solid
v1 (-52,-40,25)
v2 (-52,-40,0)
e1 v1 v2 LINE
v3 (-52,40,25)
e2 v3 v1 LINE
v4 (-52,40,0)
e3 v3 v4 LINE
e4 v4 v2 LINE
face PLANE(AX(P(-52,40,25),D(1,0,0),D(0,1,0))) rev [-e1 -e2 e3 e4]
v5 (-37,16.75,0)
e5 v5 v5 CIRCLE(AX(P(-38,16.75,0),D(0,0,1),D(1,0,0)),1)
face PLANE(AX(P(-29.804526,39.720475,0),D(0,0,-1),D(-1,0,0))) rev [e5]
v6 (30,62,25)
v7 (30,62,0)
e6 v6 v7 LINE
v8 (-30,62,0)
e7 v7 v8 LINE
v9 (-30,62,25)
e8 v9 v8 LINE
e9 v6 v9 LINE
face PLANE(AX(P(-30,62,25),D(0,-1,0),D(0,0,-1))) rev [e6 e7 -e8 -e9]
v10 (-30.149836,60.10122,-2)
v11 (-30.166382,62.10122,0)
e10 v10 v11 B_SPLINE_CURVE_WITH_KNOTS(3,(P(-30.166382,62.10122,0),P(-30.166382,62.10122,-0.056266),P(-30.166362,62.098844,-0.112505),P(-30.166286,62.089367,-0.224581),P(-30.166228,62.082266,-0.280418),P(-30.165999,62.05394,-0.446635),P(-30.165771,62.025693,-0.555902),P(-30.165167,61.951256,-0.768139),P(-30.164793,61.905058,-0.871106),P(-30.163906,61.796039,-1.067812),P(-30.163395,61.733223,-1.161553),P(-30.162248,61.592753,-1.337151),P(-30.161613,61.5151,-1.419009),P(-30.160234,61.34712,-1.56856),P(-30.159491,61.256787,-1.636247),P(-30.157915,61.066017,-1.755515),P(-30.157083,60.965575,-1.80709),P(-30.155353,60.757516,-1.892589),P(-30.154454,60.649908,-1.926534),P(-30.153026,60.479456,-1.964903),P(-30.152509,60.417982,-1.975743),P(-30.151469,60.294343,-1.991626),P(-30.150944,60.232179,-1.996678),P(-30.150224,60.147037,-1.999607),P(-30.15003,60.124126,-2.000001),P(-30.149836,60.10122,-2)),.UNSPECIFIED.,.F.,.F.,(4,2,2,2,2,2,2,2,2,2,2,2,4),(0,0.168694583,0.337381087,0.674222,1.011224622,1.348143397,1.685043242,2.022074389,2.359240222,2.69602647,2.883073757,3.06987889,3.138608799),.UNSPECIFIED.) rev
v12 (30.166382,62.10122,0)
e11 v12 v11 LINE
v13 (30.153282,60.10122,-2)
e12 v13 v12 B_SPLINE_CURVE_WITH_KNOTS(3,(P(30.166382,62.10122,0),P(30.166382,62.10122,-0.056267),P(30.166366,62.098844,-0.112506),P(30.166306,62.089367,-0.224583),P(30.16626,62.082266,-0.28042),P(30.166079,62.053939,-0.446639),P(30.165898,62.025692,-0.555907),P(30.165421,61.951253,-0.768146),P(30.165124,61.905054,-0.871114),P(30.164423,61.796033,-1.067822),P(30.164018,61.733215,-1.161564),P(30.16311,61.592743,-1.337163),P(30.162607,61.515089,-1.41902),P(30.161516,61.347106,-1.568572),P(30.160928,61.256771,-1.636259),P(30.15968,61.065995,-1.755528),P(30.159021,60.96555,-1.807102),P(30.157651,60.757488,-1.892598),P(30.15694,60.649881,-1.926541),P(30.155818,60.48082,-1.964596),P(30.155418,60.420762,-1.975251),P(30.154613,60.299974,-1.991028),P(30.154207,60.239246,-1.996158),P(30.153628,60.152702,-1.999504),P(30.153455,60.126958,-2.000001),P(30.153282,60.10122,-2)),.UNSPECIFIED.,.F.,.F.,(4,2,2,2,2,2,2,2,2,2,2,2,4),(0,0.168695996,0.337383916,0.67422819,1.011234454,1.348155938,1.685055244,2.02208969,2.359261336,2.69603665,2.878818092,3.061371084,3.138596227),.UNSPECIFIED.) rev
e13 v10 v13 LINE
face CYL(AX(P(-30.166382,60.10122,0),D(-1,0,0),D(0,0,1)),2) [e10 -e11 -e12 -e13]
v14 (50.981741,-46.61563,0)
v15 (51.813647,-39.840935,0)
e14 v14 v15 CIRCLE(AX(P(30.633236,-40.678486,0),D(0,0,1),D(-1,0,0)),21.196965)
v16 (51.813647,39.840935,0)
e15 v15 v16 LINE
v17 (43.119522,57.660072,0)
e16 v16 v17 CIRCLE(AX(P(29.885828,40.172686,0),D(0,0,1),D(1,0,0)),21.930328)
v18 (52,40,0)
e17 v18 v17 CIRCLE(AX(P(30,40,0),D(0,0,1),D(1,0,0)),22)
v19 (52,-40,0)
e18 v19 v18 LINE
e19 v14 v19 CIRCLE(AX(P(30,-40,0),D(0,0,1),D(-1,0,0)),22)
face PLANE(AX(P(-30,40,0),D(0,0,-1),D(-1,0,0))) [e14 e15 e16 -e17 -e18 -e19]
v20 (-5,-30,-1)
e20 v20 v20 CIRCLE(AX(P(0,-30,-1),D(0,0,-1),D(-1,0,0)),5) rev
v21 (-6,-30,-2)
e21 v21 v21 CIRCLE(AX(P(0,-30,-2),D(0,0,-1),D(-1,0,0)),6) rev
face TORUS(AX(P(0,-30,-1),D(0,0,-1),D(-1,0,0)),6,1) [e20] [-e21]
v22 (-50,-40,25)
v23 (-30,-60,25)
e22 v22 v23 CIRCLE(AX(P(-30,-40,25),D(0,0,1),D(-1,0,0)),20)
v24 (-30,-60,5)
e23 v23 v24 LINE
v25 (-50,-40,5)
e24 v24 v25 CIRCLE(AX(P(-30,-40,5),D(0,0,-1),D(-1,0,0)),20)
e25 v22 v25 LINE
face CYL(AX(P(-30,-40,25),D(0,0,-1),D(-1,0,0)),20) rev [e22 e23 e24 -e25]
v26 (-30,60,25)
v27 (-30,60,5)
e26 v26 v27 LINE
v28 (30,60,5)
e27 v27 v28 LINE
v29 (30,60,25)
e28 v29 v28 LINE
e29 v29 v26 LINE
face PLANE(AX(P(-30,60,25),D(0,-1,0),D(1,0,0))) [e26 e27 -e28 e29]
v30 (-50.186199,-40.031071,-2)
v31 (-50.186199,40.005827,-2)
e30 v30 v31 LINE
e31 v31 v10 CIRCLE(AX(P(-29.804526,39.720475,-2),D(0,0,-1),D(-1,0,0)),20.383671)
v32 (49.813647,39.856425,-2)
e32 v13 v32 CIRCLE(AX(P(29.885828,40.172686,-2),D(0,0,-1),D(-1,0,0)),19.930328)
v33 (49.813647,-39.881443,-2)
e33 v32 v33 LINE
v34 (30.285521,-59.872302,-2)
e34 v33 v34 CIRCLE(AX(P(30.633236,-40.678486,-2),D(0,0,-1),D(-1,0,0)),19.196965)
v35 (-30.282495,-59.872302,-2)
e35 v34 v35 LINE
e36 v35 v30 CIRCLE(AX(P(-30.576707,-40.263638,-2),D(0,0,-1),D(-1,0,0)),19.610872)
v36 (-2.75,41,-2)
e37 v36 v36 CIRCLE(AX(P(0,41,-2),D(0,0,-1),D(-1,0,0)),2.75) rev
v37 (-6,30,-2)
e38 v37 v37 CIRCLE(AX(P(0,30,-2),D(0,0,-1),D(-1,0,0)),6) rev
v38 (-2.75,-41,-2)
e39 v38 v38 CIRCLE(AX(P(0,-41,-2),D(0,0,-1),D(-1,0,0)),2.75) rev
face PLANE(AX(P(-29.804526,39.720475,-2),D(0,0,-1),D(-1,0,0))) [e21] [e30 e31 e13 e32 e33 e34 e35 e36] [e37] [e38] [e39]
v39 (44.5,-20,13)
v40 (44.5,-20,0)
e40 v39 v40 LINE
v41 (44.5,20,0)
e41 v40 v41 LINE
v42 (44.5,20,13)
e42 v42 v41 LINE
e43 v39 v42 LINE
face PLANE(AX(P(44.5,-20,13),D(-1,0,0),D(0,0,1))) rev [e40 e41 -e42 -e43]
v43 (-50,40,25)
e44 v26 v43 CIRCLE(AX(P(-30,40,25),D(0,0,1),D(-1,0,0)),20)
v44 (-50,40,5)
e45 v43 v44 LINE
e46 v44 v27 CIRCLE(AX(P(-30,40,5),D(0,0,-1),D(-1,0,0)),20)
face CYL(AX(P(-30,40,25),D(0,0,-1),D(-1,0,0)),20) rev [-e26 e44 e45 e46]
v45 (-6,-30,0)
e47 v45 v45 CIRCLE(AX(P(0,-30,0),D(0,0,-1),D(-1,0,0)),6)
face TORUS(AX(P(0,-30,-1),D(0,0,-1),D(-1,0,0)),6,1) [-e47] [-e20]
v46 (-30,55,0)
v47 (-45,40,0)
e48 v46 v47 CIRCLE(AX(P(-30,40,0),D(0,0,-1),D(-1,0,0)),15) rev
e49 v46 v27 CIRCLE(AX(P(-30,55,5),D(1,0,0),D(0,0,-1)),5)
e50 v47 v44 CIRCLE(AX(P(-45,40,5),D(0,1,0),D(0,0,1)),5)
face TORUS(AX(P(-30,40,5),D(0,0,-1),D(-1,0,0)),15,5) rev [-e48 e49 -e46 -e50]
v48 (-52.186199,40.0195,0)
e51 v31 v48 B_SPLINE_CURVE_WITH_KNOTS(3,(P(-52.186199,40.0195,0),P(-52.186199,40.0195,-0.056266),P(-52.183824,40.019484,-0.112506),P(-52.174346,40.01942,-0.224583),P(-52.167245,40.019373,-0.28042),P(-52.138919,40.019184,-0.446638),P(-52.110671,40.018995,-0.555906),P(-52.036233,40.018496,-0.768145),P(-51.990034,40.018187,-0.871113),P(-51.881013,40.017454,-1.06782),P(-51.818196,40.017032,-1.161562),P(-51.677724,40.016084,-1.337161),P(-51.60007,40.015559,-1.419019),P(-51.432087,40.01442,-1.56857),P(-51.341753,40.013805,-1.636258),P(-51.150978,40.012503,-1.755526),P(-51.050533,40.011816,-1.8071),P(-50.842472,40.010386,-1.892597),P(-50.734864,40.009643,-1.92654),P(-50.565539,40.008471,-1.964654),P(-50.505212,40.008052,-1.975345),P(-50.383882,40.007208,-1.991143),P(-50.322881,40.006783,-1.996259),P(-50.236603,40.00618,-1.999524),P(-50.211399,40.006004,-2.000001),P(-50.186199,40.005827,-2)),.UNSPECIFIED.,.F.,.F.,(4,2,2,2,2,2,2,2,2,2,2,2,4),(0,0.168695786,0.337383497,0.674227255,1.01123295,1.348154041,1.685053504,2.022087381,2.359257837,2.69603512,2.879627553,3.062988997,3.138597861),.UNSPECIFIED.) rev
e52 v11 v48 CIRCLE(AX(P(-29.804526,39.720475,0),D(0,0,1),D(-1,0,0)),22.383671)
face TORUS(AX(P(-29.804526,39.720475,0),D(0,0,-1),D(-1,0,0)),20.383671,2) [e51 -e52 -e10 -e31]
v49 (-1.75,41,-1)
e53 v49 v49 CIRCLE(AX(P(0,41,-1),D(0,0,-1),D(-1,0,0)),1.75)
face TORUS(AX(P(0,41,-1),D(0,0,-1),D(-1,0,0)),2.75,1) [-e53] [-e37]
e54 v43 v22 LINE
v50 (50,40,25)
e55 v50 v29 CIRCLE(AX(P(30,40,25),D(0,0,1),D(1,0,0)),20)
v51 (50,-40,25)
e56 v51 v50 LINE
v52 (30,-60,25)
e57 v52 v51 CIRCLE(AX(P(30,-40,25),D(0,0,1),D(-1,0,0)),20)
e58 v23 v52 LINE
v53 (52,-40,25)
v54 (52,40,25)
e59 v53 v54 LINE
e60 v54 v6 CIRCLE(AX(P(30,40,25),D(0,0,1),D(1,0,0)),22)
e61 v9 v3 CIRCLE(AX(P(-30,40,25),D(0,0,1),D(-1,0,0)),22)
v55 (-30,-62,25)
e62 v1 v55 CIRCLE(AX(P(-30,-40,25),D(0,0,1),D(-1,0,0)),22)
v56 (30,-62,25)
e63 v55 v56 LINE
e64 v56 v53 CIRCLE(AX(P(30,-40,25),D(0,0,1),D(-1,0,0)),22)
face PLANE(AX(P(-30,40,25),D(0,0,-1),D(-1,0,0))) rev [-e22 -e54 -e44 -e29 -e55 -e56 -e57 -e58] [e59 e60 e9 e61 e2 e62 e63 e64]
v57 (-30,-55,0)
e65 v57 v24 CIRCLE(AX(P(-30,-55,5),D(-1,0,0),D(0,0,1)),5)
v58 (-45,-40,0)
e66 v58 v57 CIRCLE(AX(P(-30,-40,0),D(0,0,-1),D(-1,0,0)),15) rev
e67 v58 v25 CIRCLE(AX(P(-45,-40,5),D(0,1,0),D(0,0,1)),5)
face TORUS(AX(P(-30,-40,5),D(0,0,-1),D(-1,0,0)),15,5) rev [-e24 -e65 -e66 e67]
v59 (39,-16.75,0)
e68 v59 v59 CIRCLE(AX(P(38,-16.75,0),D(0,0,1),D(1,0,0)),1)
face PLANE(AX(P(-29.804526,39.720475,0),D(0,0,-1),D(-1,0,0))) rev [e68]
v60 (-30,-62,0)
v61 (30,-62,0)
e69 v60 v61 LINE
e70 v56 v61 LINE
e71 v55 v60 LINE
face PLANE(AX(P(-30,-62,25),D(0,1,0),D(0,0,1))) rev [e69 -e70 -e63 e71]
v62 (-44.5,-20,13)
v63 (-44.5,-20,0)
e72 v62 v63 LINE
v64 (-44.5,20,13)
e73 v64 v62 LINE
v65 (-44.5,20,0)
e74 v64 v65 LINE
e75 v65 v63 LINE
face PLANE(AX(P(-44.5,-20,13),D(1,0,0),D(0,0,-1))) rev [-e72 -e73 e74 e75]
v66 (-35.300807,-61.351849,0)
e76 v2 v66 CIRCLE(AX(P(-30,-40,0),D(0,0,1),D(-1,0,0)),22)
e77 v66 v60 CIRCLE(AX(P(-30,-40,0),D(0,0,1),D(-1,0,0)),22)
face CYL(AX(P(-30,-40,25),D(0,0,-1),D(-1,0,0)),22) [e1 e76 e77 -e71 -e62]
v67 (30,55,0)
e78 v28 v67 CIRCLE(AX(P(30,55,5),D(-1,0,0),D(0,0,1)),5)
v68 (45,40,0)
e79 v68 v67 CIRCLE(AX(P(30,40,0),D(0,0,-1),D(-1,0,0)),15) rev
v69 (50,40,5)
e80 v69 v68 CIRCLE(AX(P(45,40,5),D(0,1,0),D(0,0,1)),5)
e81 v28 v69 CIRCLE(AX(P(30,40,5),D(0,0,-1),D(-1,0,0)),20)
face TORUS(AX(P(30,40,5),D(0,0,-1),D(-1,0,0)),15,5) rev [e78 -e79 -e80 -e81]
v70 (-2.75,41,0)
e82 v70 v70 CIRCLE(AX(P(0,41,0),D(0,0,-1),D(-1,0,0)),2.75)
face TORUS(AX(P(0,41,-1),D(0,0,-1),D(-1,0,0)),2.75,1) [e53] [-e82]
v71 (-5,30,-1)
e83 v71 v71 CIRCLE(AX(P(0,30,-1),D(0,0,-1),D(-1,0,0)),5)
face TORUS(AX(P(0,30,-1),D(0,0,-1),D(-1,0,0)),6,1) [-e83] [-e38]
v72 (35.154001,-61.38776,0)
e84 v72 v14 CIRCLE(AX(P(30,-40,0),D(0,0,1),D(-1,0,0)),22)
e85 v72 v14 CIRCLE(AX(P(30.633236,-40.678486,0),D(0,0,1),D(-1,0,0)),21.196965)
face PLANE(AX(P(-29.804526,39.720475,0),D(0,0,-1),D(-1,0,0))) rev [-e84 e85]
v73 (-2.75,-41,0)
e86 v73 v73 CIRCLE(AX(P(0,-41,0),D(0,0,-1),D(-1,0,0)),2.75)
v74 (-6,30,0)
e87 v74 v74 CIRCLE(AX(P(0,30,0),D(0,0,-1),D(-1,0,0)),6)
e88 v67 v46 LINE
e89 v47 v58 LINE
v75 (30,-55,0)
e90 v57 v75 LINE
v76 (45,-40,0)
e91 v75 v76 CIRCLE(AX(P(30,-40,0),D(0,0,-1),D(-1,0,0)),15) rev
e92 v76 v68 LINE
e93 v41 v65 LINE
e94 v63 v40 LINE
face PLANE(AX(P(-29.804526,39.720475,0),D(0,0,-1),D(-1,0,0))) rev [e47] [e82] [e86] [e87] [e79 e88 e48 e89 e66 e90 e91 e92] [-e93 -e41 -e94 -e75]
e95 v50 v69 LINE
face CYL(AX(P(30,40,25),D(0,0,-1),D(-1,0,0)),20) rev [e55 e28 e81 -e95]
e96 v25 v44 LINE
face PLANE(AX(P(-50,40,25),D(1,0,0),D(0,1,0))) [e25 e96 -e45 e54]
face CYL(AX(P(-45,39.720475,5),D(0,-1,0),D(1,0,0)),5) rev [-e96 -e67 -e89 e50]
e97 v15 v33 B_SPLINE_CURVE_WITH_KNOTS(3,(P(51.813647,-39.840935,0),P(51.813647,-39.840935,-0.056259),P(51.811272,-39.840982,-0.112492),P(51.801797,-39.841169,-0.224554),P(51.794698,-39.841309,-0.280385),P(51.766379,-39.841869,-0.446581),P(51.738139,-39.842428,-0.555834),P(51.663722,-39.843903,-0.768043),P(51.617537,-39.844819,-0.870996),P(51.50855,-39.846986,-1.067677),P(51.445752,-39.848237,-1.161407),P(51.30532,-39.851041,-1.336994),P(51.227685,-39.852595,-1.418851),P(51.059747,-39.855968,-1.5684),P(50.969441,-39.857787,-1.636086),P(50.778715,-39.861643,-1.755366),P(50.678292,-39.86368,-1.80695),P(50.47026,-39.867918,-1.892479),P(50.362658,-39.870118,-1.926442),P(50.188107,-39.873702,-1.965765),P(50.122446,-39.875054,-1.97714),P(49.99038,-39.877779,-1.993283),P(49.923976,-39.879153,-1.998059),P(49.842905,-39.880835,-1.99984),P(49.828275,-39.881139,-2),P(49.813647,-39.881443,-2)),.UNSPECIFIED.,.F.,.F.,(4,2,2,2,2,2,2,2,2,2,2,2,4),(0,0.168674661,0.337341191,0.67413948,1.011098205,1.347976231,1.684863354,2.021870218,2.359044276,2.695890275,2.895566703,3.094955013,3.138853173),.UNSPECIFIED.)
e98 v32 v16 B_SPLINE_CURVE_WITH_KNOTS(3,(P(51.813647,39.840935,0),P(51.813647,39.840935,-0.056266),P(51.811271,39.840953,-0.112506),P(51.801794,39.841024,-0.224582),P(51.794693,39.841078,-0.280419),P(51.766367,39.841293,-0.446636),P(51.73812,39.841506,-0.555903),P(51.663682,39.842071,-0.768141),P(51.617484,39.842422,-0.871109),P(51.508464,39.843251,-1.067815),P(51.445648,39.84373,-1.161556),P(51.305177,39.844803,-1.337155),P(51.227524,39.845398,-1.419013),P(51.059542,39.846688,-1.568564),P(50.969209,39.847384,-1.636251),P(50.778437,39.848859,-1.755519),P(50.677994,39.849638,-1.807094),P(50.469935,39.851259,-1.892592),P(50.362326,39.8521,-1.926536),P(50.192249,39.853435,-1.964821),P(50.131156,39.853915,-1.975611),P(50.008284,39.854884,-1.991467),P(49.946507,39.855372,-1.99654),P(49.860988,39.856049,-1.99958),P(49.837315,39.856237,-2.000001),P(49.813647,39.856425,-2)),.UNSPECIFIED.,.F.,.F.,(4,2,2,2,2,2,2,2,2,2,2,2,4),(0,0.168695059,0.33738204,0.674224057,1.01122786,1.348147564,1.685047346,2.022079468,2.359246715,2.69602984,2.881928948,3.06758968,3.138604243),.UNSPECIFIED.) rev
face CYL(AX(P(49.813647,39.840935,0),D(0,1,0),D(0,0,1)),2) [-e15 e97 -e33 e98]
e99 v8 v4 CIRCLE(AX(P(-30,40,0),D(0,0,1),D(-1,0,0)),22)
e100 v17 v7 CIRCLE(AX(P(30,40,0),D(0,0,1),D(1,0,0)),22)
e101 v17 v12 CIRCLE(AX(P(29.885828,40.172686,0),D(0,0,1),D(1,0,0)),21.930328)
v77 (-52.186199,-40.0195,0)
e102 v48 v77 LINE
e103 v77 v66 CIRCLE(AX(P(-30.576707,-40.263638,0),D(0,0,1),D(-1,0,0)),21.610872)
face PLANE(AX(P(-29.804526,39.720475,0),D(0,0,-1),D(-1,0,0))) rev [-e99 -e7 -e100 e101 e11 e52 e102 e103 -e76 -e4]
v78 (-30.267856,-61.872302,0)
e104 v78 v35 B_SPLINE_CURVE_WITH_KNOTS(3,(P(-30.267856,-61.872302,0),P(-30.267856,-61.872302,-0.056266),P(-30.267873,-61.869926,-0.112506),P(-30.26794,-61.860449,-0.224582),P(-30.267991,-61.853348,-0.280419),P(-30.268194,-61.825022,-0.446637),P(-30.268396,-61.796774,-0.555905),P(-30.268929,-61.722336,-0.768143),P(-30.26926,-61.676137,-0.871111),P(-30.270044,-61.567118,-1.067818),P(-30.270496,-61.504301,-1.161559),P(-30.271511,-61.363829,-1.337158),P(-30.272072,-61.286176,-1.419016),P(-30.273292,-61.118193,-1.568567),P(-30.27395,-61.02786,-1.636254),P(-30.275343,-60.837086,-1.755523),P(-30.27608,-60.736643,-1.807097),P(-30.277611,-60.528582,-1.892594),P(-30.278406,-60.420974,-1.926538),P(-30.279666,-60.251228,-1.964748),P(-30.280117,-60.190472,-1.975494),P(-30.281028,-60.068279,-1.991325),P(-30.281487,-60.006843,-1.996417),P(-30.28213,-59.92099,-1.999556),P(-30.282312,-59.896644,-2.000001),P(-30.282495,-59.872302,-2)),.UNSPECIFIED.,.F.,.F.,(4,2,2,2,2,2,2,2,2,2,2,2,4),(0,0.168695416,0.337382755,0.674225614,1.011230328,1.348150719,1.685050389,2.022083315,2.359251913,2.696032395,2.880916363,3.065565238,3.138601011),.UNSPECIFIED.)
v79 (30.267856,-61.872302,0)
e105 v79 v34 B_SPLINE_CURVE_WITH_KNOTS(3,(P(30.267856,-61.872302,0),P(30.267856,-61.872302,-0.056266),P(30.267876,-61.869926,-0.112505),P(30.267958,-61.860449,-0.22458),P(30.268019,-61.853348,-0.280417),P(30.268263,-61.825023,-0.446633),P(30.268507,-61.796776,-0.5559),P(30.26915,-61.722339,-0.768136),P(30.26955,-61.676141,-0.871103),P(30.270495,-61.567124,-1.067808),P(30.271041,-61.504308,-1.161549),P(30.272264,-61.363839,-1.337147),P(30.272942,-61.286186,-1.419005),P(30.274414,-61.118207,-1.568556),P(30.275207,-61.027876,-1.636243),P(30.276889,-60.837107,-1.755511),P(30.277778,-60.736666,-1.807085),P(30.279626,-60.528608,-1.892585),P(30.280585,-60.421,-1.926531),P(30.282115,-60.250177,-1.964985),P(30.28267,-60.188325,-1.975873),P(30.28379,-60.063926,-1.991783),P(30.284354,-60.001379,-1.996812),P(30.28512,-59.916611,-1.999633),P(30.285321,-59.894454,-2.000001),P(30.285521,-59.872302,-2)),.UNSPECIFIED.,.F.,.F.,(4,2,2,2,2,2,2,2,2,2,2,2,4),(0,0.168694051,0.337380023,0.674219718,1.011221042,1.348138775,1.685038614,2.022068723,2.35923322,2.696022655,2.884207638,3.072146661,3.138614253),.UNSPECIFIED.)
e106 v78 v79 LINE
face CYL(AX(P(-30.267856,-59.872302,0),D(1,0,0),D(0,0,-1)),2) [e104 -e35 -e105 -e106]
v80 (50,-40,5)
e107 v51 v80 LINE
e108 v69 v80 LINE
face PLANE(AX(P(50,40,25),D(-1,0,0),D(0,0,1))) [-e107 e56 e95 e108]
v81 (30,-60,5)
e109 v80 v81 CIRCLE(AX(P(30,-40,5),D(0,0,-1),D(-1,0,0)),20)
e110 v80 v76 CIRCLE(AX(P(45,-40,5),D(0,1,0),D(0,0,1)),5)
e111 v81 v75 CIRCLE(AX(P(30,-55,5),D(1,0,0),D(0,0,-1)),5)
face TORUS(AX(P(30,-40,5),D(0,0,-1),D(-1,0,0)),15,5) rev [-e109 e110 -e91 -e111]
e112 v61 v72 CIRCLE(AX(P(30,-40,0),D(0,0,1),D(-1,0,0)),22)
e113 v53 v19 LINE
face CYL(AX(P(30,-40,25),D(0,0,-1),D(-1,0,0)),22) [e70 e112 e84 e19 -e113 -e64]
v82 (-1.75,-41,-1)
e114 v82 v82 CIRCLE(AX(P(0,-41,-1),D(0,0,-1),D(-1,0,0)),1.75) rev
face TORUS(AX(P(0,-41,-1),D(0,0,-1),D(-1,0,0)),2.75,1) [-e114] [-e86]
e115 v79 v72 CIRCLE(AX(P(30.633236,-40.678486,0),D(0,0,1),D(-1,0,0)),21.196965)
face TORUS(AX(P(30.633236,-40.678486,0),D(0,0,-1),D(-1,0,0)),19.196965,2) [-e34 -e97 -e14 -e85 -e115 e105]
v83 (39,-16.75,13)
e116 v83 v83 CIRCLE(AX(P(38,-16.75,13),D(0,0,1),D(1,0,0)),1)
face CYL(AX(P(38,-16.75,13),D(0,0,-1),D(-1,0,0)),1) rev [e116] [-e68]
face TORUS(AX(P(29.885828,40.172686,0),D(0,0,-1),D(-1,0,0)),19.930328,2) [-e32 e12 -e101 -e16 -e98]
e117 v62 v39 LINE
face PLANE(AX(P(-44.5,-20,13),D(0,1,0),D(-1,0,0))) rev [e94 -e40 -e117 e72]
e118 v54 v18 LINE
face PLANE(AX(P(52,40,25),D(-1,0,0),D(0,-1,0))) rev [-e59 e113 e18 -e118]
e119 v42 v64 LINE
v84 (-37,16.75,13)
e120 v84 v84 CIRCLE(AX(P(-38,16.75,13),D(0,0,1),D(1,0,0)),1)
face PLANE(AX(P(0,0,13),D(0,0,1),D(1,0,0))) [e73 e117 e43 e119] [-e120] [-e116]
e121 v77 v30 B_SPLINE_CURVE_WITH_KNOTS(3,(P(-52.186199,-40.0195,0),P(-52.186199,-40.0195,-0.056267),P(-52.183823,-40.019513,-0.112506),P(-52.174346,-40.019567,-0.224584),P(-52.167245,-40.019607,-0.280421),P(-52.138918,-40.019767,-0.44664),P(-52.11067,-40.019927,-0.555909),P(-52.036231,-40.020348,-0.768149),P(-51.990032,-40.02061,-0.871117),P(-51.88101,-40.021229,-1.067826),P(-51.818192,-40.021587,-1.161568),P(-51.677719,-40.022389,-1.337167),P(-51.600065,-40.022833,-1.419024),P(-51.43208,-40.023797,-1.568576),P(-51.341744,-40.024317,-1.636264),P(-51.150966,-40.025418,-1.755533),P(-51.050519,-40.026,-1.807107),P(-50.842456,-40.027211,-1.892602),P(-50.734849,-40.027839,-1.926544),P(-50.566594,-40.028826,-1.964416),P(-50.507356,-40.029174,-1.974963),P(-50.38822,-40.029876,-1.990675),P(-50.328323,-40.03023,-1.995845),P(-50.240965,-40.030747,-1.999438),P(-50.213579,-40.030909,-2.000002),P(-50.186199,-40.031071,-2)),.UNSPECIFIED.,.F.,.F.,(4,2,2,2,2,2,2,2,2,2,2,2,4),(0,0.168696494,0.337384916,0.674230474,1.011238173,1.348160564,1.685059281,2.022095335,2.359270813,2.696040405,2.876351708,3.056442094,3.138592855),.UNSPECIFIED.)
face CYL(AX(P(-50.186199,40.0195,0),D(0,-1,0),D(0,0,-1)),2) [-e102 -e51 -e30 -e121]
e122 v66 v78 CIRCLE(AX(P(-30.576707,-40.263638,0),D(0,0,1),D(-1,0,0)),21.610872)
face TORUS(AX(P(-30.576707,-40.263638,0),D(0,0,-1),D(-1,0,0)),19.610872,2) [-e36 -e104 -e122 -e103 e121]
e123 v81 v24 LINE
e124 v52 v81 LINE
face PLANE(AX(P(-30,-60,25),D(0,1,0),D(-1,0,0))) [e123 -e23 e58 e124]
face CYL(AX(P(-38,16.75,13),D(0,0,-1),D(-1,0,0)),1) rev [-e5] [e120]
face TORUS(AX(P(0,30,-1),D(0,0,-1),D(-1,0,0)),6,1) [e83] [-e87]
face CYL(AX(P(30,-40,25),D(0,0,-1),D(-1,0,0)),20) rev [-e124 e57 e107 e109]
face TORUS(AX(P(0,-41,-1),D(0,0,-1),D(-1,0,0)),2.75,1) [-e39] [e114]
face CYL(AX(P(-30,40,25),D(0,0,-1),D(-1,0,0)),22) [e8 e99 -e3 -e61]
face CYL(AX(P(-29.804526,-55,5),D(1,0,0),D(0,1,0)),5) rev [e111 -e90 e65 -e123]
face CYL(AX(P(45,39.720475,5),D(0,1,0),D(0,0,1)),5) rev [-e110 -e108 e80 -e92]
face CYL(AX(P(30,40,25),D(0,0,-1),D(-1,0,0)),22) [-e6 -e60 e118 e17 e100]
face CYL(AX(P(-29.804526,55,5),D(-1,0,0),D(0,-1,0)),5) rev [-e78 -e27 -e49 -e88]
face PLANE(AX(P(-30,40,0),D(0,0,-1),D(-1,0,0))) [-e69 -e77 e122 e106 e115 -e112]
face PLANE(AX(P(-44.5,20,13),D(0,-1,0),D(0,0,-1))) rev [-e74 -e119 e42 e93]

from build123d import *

# Parameters (mm, degrees)
BOSS_EXTRUDE7_DEPTH  = 25
CASE_BOTTOM_R        = 1.75
CASE_BOTTOM_R_2      = 5
BOSS_EXTRUDE9_DEPTH  = 2
FILLET1_R            = 5
FILLET2_R            = 2
FILLET3_R            = 1
SONOFF_W             = 89
SONOFF_H             = 40
SONOFF_R             = 1
BOSS_EXTRUDE10_DEPTH = 13


# Some blends are built 0.0001 mm under size
with BuildPart() as part:
    # Case Sides → Boss-Extrude7 (new body)
    with BuildSketch(Plane.XY):
        with BuildLine():
            Line((-30, 62), (30, 62))
            ThreePointArc((30, 62), (45.556349186, 55.556349186), (52, 40))
            Line((52, 40), (52, -40))
            ThreePointArc((52, -40), (45.556349186, -55.556349186), (30, -62))
            Line((30, -62), (-30, -62))
            ThreePointArc((-30, -62), (-45.556349186, -55.556349186), (-52, -40))
            Line((-52, -40), (-52, 40))
            ThreePointArc((-52, 40), (-45.556349186, 55.556349186), (-30, 62))
        make_face()
        with BuildLine():
            Line((-30, 60), (30, 60))
            ThreePointArc((30, 60), (44.142135624, 54.142135624), (50, 40))
            Line((50, 40), (50, -40))
            ThreePointArc((50, -40), (44.142135624, -54.142135624), (30, -60))
            Line((30, -60), (-30, -60))
            ThreePointArc((-30, -60), (-44.142135624, -54.142135624), (-50, -40))
            Line((-50, -40), (-50, 40))
            ThreePointArc((-50, 40), (-44.142135624, 54.142135624), (-30, 60))
        make_face(mode=Mode.SUBTRACT)
    extrude(amount=BOSS_EXTRUDE7_DEPTH)

    # Case Bottom → Boss-Extrude9 (add)
    with BuildSketch(Plane.XY):
        with BuildLine():
            Line((-30.166381545, 62.101220113), (30.166381545, 62.101220113))
            ThreePointArc((30.166381545, 62.101220113), (45.607883681, 55.461776572), (51.813647258, 39.840934815))
            Line((51.813647258, 39.840934815), (51.813647258, -39.840934815))
            ThreePointArc((51.813647258, -39.840934815), (45.787828122, -55.499068587), (30.267855704, -61.872302115))
            Line((30.267855704, -61.872302115), (-30.267855704, -61.872302115))
            ThreePointArc((-30.267855704, -61.872302115), (-45.835002173, -55.567695757), (-52.186199447, -40.019499601))
            Line((-52.186199447, -40.019499601), (-52.186199447, 40.019499601))
            ThreePointArc((-52.186199447, 40.019499601), (-45.654372223, 55.52588799), (-30.166381545, 62.101220113))
        make_face()
        with Locations((0, 41)):
            Circle(CASE_BOTTOM_R, mode=Mode.SUBTRACT)
        with Locations((0, -41)):
            Circle(CASE_BOTTOM_R, mode=Mode.SUBTRACT)
        with Locations((0, 30)):
            Circle(CASE_BOTTOM_R_2, mode=Mode.SUBTRACT)
        with Locations((0, -30)):
            Circle(CASE_BOTTOM_R_2, mode=Mode.SUBTRACT)
    extrude(amount=-BOSS_EXTRUDE9_DEPTH)

    # Fillet1
    fillet1_edges = [part.edges().sort_by_distance(p)[0] for p in [
        (44.142135624, 54.142135624, 0),
        (0, 60, 0),
        (-44.142135624, 54.142135624, 0),
        (-50, 0, 0),
        (-44.142135624, -54.142135624, 0),
        (0, -60, 0),
        (44.142135624, -54.142135624, 0),
        (50, 0, 0),
    ]]
    fillet(fillet1_edges, radius=FILLET1_R)

    # Fillet2
    # the kernel refuses this fillet: 2 mm, written as the material it adds along each edge
    with BuildSketch(Plane(origin=(51.813647258, 39.840934815, 0.036995851), x_dir=(0.014804575706989804, 0.9998904062636744, 0), z_dir=(0, 0, -1))) as fillet2_piece_1:
        with BuildLine():
            CenterArc((0.014812433, 1.999999896), FILLET2_R, 269.151729306, 0.829764856)
            Line((-0.014796719, 0.000219083), (0, 0))
            ThreePointArc((0, 0), (0.007083229, 1.144e-06), (0.014166457, 0))
        make_face()
    extrude(amount=2.036995851)
    with BuildSketch(Plane(origin=(51.813647258, -39.840934815, 0.096592655), x_dir=(0, 1, 0), z_dir=(0, 0, -1))) as fillet2_piece_2:
        with BuildLine():
            CenterArc((0.038637062, 2), FILLET2_R, 267.835326297, 2.164673703)
            ThreePointArc((-0.03690633, 0.00142721), (-0.018452854, 0.000721643), (0, 0))
            Line((0, 0), (0.038637062, 0))
        make_face()
    extrude(amount=2.096592655)
    with BuildSketch(Plane(origin=(30.267855704, -61.872302115, 0.042125301), x_dir=(0.9998579024887219, -0.016857485899548712, 0), z_dir=(0, 0, -1))) as fillet2_piece_3:
        with BuildLine():
            CenterArc((0.016867246, 1.999999856), FILLET2_R, 269.034091453, 0.944139309)
            Line((-0.016847726, 0.000284051), (0, 0))
            ThreePointArc((0, 0), (0.008053678, 1.53e-06), (0.016107356, 0))
        make_face()
    extrude(amount=2.042125301)
    with BuildSketch(Plane(origin=(-30.267855704, -61.872302115, 0.034939961), x_dir=(-0.9999022450245147, -0.013982145576956704, 0), z_dir=(0, 0, -1))) as fillet2_piece_4:
        with BuildLine():
            CenterArc((0.013989673, -1.999999904), FILLET2_R, 90.017724864, 0.783419172)
            Line((-0.013974618, -0.000195414), (0, 0))
            ThreePointArc((0, 0), (0.006685479, -1.034e-06), (0.013370958, 0))
        make_face()
    extrude(amount=2.034939961)
    with BuildSketch(Plane(origin=(-52.186199447, -40.019499601, 0), x_dir=(0, 1, 0), z_dir=(0, 0, -1))) as fillet2_piece_5:
        with BuildLine():
            CenterArc((0.011047407, -2), FILLET2_R, 90, 0.619262575)
            ThreePointArc((-0.010568514, -0.000116815), (-0.00528425, -5.9054e-05), (0, 0))
            Line((0, 0), (0.011047407, 0))
        make_face()
    extrude(amount=2)
    # the kernel refuses this fillet: 2 mm, written as the material it takes off along each edge
    with BuildSketch(Plane(origin=(-52.186199447, 40.019499601, 0.035818212), x_dir=(0, -1, 0), z_dir=(0, 0, -1))) as fillet2_2_piece_1:
        with BuildLine():
            CenterArc((0.013672232, -2), FILLET2_R, 90, 0.802114876)
            ThreePointArc((-0.014325944, -0.000195984), (-0.007162988, -9.6846e-05), (0, 0))
            Line((0, 0), (0.013672232, 0))
        make_face()
    extrude(amount=2.071636423, mode=Mode.SUBTRACT)
    with BuildSketch(Plane(origin=(-30.166381545, 62.101220113, 0.043345147), x_dir=(1, 0, 0), z_dir=(0, 0, -1))) as fillet2_2_piece_2:
        with BuildLine():
            CenterArc((0.016545352, 2), FILLET2_R, 269.029333404, 0.970666596)
            ThreePointArc((-0.017335683, 0.000287002), (-0.008667869, 0.000141822), (0, 0))
            Line((0, 0), (0.016545352, 0))
        make_face()
    extrude(amount=2.086690294, mode=Mode.SUBTRACT)
    with BuildSketch(Plane(origin=(30.166381545, 62.101220113, 0.034352007), x_dir=(0.9999141102581969, -0.013106185812745422, 0), z_dir=(0, 0, -1))) as fillet2_2_piece_3:
        with BuildLine():
            CenterArc((0.013114237, 1.999999902), FILLET2_R, 269.249049368, 0.768900433)
            Line((-0.013098135, 0.000171681), (0, 0))
            ThreePointArc((0, 0), (0.006870401, -1.076e-06), (0.013740803, 0))
        make_face()
    extrude(amount=2.068704014, mode=Mode.SUBTRACT)
    # the kernel refuses this fillet: 2 mm, written as the material it takes off along each edge
    with BuildSketch(Plane(origin=(-29.804526261, 39.720474564, -2), x_dir=(-0.9999020079624725, 0.013999088278010021, 0), z_dir=(-0.013999088278010021, -0.9999020079624725, 0))) as fillet2_3_piece_1:
        with BuildLine():
            CenterArc((22.383670624 - FILLET2_R, -FILLET2_R), FILLET2_R, 0, 90)
            Line((22.383670624, -FILLET2_R), (22.383670624, 0))
            Line((22.383670624, 0), (22.383670624 - FILLET2_R, 0))
        make_face()
    revolve(axis=Axis((-29.804526261, 39.720474564, -2), (0, 0, -1)), revolution_arc=88.227218528, mode=Mode.SUBTRACT)
    with BuildSketch(Plane(origin=(-30.149836193, 62.101220113, -2), x_dir=(0, -1, 0), z_dir=(1, 0, 0))) as fillet2_3_piece_2:
        with BuildLine():
            CenterArc((FILLET2_R, -FILLET2_R), FILLET2_R, 90, 90)
            Line((0, -FILLET2_R), (0, 0))
            Line((0, 0), (FILLET2_R, 0))
        make_face()
    extrude(amount=60.303118478, mode=Mode.SUBTRACT)
    with BuildSketch(Plane(origin=(29.885828413, 40.172686456, -2), x_dir=(0.013419441370281596, 0.9999099552426256, 0), z_dir=(-0.9999099552426256, 0.013419441370281596, 0))) as fillet2_3_piece_3:
        with BuildLine():
            CenterArc((21.930328279 - FILLET2_R, -FILLET2_R), FILLET2_R, 0, 90)
            Line((21.930328279, -FILLET2_R), (21.930328279, 0))
            Line((21.930328279, 0), (21.930328279 - FILLET2_R, 0))
        make_face()
    revolve(axis=Axis((29.885828413, 40.172686456, -2), (0, 0, -1)), revolution_arc=90.060864423, mode=Mode.SUBTRACT)
    with BuildSketch(Plane(origin=(51.813647258, 39.826136474, -2), x_dir=(-1, 0, 0), z_dir=(0, -1, 0))) as fillet2_3_piece_4:
        with BuildLine():
            CenterArc((FILLET2_R, -FILLET2_R), FILLET2_R, 90, 90)
            Line((0, -FILLET2_R), (0, 0))
            Line((0, 0), (FILLET2_R, 0))
        make_face()
    extrude(amount=79.628434227, mode=Mode.SUBTRACT)
    with BuildSketch(Plane(origin=(30.63323575, -40.678486464, -2), x_dir=(0.999286394870838, 0.03777169609699212, 0), z_dir=(-0.03777169609699212, 0.999286394870838, 0))) as fillet2_3_piece_5:
        with BuildLine():
            CenterArc((21.196964981 - FILLET2_R, -FILLET2_R), FILLET2_R, 0, 90)
            Line((21.196964981, -FILLET2_R), (21.196964981, 0))
            Line((21.196964981, 0), (21.196964981 - FILLET2_R, 0))
        make_face()
    revolve(axis=Axis((30.63323575, -40.678486464, -2), (0, 0, -1)), revolution_arc=93.108813012, mode=Mode.SUBTRACT)
    with BuildSketch(Plane(origin=(30.251005584, -61.872302115, -2), x_dir=(0, 1, 0), z_dir=(-1, 0, 0))) as fillet2_3_piece_6:
        with BuildLine():
            CenterArc((FILLET2_R, -FILLET2_R), FILLET2_R, 90, 90)
            Line((0, -FILLET2_R), (0, 0))
            Line((0, 0), (FILLET2_R, 0))
        make_face()
    extrude(amount=60.504885303, mode=Mode.SUBTRACT)
    with BuildSketch(Plane(origin=(-30.576706868, -40.263637561, -2), x_dir=(0.013672817925882458, -0.9999065226559758, 0), z_dir=(0.9999065226559758, 0.013672817925882458, 0))) as fillet2_3_piece_7:
        with BuildLine():
            CenterArc((21.610871636 - FILLET2_R, -FILLET2_R), FILLET2_R, 0, 90)
            Line((21.610871636, -FILLET2_R), (21.610871636, 0))
            Line((21.610871636, 0), (21.610871636 - FILLET2_R, 0))
        make_face()
    revolve(axis=Axis((-30.576706868, -40.263637561, -2), (0, 0, -1)), revolution_arc=91.402681747, mode=Mode.SUBTRACT)
    with BuildSketch(Plane(origin=(-52.186199447, -40.008452194, -2), x_dir=(1, 0, 0), z_dir=(0, 1, 0))) as fillet2_3_piece_8:
        with BuildLine():
            CenterArc((FILLET2_R, -FILLET2_R), FILLET2_R, 90, 90)
            Line((0, -FILLET2_R), (0, 0))
            Line((0, 0), (FILLET2_R, 0))
        make_face()
    extrude(amount=80.014279563, mode=Mode.SUBTRACT)
    with BuildSketch(Plane(origin=(-54.186199447, -40.008452194, -2), x_dir=(1, 0, 0), z_dir=(0, 1, 0))) as fillet2_3_piece_9:
        with BuildLine():
            CenterArc((2 + FILLET2_R, -FILLET2_R), FILLET2_R, 90, 90)
            Line((2, -FILLET2_R), (2, 0))
            Line((2, 0), (2 + FILLET2_R, 0))
        make_face()
    revolve(axis=Axis((-54.186199447, -40.008452194, -2), (0, 0, -1)), revolution_arc=0.619262575, mode=Mode.SUBTRACT)
    with BuildSketch(Plane(origin=(-50.186199447, 40.005827368, -2), x_dir=(-0.9999020079624727, 0.013999088277994795, 0), z_dir=(0.013999088277994795, 0.9999020079624727, 0))) as fillet2_3_piece_10:
        with BuildLine():
            CenterArc((2 - FILLET2_R, FILLET2_R), FILLET2_R, 270, 90)
            Line((2, FILLET2_R), (2, 0))
            Line((2, 0), (2 - FILLET2_R, 0))
        make_face()
    revolve(axis=Axis((-50.186199447, 40.005827368, -2), (0, 0, 1)), revolution_arc=0.802114876, mode=Mode.SUBTRACT)
    with BuildSketch(Plane(origin=(-30.253879719, -63.872302115, -2), x_dir=(-0.013672817925883145, 0.999906522655976, 0), z_dir=(-0.999906522655976, -0.013672817925883145, 0))) as fillet2_3_piece_11:
        with BuildLine():
            CenterArc((2 + FILLET2_R, -FILLET2_R), FILLET2_R, 90, 90)
            Line((2, -FILLET2_R), (2, 0))
            Line((2, 0), (2 + FILLET2_R, 0))
        make_face()
    revolve(axis=Axis((-30.253879719, -63.872302115, -2), (0, 0, -1)), revolution_arc=0.783419172, mode=Mode.SUBTRACT)
    with BuildSketch(Plane(origin=(30.251005584, -63.872302115, -2), x_dir=(0.016477593803021027, 0.9998642352351956, 0), z_dir=(0.9998642352351956, -0.016477593803021027, 0))) as fillet2_3_piece_12:
        with BuildLine():
            CenterArc((2 + FILLET2_R, FILLET2_R), FILLET2_R, 180, 90)
            Line((2, FILLET2_R), (2, 0))
            Line((2, 0), (2 + FILLET2_R, 0))
        make_face()
    revolve(axis=Axis((30.251005584, -63.872302115, -2), (0, 0, 1)), revolution_arc=0.944139309, mode=Mode.SUBTRACT)
    with BuildSketch(Plane(origin=(53.813647258, -39.802297753, -2), x_dir=(-1, 0, 0), z_dir=(0, 1, 0))) as fillet2_3_piece_13:
        with BuildLine():
            CenterArc((2 + FILLET2_R, FILLET2_R), FILLET2_R, 180, 90)
            Line((2, FILLET2_R), (2, 0))
            Line((2, 0), (2 + FILLET2_R, 0))
        make_face()
    revolve(axis=Axis((53.813647258, -39.802297753, -2), (0, 0, 1)), revolution_arc=2.164673703, mode=Mode.SUBTRACT)
    with BuildSketch(Plane(origin=(53.813647258, 39.826136474, -2), x_dir=(-0.9998951358062248, 0.014481622528268918, 0), z_dir=(0.014481622528268918, 0.9998951358062248, 0))) as fillet2_3_piece_14:
        with BuildLine():
            CenterArc((2 + FILLET2_R, FILLET2_R), FILLET2_R, 180, 90)
            Line((2, FILLET2_R), (2, 0))
            Line((2, 0), (2 + FILLET2_R, 0))
        make_face()
    revolve(axis=Axis((53.813647258, 39.826136474, -2), (0, 0, 1)), revolution_arc=0.829764856, mode=Mode.SUBTRACT)
    with BuildSketch(Plane(origin=(30.153282285, 60.101220113, -2), x_dir=(0.013419441370290391, 0.9999099552426255, 0), z_dir=(0.9999099552426255, -0.013419441370290391, 0))) as fillet2_3_piece_15:
        with BuildLine():
            CenterArc((2 - FILLET2_R, FILLET2_R), FILLET2_R, 270, 90)
            Line((2, FILLET2_R), (2, 0))
            Line((2, 0), (2 - FILLET2_R, 0))
        make_face()
    revolve(axis=Axis((30.153282285, 60.101220113, -2), (0, 0, 1)), revolution_arc=0.768900433, mode=Mode.SUBTRACT)
    with BuildSketch(Plane(origin=(-30.149836193, 60.101220113, -2), x_dir=(0, 1, 0), z_dir=(1, 0, 0))) as fillet2_3_piece_16:
        with BuildLine():
            CenterArc((2 - FILLET2_R, FILLET2_R), FILLET2_R, 270, 90)
            Line((2, FILLET2_R), (2, 0))
            Line((2, 0), (2 - FILLET2_R, 0))
        make_face()
    revolve(axis=Axis((-30.149836193, 60.101220113, -2), (0, 0, 1)), revolution_arc=0.970666596, mode=Mode.SUBTRACT)

    # Fillet3
    fillet3_edges = [part.edges().sort_by_distance(p)[0] for p in [
        (-5, -30, -2),
        (-5, 30, -2),
        (-1.75, -41, -2),
        (-1.75, 41, -2),
        (-1.75, 41, 0),
        (-1.75, -41, 0),
        (-5, 30, 0),
        (-5, -30, 0),
    ]]
    fillet(fillet3_edges, radius=FILLET3_R - 0.0001)  # a hair under: the kernel refuses the full size

    # Sonoff → Boss-Extrude10 (add)
    with BuildSketch(Plane.XY):
        Rectangle(SONOFF_W, SONOFF_H)
        with Locations((-38, 16.75)):
            Circle(SONOFF_R, mode=Mode.SUBTRACT)
        with Locations((38, -16.75)):
            Circle(SONOFF_R, mode=Mode.SUBTRACT)
    extrude(amount=BOSS_EXTRUDE10_DEPTH)


solid = part.part
